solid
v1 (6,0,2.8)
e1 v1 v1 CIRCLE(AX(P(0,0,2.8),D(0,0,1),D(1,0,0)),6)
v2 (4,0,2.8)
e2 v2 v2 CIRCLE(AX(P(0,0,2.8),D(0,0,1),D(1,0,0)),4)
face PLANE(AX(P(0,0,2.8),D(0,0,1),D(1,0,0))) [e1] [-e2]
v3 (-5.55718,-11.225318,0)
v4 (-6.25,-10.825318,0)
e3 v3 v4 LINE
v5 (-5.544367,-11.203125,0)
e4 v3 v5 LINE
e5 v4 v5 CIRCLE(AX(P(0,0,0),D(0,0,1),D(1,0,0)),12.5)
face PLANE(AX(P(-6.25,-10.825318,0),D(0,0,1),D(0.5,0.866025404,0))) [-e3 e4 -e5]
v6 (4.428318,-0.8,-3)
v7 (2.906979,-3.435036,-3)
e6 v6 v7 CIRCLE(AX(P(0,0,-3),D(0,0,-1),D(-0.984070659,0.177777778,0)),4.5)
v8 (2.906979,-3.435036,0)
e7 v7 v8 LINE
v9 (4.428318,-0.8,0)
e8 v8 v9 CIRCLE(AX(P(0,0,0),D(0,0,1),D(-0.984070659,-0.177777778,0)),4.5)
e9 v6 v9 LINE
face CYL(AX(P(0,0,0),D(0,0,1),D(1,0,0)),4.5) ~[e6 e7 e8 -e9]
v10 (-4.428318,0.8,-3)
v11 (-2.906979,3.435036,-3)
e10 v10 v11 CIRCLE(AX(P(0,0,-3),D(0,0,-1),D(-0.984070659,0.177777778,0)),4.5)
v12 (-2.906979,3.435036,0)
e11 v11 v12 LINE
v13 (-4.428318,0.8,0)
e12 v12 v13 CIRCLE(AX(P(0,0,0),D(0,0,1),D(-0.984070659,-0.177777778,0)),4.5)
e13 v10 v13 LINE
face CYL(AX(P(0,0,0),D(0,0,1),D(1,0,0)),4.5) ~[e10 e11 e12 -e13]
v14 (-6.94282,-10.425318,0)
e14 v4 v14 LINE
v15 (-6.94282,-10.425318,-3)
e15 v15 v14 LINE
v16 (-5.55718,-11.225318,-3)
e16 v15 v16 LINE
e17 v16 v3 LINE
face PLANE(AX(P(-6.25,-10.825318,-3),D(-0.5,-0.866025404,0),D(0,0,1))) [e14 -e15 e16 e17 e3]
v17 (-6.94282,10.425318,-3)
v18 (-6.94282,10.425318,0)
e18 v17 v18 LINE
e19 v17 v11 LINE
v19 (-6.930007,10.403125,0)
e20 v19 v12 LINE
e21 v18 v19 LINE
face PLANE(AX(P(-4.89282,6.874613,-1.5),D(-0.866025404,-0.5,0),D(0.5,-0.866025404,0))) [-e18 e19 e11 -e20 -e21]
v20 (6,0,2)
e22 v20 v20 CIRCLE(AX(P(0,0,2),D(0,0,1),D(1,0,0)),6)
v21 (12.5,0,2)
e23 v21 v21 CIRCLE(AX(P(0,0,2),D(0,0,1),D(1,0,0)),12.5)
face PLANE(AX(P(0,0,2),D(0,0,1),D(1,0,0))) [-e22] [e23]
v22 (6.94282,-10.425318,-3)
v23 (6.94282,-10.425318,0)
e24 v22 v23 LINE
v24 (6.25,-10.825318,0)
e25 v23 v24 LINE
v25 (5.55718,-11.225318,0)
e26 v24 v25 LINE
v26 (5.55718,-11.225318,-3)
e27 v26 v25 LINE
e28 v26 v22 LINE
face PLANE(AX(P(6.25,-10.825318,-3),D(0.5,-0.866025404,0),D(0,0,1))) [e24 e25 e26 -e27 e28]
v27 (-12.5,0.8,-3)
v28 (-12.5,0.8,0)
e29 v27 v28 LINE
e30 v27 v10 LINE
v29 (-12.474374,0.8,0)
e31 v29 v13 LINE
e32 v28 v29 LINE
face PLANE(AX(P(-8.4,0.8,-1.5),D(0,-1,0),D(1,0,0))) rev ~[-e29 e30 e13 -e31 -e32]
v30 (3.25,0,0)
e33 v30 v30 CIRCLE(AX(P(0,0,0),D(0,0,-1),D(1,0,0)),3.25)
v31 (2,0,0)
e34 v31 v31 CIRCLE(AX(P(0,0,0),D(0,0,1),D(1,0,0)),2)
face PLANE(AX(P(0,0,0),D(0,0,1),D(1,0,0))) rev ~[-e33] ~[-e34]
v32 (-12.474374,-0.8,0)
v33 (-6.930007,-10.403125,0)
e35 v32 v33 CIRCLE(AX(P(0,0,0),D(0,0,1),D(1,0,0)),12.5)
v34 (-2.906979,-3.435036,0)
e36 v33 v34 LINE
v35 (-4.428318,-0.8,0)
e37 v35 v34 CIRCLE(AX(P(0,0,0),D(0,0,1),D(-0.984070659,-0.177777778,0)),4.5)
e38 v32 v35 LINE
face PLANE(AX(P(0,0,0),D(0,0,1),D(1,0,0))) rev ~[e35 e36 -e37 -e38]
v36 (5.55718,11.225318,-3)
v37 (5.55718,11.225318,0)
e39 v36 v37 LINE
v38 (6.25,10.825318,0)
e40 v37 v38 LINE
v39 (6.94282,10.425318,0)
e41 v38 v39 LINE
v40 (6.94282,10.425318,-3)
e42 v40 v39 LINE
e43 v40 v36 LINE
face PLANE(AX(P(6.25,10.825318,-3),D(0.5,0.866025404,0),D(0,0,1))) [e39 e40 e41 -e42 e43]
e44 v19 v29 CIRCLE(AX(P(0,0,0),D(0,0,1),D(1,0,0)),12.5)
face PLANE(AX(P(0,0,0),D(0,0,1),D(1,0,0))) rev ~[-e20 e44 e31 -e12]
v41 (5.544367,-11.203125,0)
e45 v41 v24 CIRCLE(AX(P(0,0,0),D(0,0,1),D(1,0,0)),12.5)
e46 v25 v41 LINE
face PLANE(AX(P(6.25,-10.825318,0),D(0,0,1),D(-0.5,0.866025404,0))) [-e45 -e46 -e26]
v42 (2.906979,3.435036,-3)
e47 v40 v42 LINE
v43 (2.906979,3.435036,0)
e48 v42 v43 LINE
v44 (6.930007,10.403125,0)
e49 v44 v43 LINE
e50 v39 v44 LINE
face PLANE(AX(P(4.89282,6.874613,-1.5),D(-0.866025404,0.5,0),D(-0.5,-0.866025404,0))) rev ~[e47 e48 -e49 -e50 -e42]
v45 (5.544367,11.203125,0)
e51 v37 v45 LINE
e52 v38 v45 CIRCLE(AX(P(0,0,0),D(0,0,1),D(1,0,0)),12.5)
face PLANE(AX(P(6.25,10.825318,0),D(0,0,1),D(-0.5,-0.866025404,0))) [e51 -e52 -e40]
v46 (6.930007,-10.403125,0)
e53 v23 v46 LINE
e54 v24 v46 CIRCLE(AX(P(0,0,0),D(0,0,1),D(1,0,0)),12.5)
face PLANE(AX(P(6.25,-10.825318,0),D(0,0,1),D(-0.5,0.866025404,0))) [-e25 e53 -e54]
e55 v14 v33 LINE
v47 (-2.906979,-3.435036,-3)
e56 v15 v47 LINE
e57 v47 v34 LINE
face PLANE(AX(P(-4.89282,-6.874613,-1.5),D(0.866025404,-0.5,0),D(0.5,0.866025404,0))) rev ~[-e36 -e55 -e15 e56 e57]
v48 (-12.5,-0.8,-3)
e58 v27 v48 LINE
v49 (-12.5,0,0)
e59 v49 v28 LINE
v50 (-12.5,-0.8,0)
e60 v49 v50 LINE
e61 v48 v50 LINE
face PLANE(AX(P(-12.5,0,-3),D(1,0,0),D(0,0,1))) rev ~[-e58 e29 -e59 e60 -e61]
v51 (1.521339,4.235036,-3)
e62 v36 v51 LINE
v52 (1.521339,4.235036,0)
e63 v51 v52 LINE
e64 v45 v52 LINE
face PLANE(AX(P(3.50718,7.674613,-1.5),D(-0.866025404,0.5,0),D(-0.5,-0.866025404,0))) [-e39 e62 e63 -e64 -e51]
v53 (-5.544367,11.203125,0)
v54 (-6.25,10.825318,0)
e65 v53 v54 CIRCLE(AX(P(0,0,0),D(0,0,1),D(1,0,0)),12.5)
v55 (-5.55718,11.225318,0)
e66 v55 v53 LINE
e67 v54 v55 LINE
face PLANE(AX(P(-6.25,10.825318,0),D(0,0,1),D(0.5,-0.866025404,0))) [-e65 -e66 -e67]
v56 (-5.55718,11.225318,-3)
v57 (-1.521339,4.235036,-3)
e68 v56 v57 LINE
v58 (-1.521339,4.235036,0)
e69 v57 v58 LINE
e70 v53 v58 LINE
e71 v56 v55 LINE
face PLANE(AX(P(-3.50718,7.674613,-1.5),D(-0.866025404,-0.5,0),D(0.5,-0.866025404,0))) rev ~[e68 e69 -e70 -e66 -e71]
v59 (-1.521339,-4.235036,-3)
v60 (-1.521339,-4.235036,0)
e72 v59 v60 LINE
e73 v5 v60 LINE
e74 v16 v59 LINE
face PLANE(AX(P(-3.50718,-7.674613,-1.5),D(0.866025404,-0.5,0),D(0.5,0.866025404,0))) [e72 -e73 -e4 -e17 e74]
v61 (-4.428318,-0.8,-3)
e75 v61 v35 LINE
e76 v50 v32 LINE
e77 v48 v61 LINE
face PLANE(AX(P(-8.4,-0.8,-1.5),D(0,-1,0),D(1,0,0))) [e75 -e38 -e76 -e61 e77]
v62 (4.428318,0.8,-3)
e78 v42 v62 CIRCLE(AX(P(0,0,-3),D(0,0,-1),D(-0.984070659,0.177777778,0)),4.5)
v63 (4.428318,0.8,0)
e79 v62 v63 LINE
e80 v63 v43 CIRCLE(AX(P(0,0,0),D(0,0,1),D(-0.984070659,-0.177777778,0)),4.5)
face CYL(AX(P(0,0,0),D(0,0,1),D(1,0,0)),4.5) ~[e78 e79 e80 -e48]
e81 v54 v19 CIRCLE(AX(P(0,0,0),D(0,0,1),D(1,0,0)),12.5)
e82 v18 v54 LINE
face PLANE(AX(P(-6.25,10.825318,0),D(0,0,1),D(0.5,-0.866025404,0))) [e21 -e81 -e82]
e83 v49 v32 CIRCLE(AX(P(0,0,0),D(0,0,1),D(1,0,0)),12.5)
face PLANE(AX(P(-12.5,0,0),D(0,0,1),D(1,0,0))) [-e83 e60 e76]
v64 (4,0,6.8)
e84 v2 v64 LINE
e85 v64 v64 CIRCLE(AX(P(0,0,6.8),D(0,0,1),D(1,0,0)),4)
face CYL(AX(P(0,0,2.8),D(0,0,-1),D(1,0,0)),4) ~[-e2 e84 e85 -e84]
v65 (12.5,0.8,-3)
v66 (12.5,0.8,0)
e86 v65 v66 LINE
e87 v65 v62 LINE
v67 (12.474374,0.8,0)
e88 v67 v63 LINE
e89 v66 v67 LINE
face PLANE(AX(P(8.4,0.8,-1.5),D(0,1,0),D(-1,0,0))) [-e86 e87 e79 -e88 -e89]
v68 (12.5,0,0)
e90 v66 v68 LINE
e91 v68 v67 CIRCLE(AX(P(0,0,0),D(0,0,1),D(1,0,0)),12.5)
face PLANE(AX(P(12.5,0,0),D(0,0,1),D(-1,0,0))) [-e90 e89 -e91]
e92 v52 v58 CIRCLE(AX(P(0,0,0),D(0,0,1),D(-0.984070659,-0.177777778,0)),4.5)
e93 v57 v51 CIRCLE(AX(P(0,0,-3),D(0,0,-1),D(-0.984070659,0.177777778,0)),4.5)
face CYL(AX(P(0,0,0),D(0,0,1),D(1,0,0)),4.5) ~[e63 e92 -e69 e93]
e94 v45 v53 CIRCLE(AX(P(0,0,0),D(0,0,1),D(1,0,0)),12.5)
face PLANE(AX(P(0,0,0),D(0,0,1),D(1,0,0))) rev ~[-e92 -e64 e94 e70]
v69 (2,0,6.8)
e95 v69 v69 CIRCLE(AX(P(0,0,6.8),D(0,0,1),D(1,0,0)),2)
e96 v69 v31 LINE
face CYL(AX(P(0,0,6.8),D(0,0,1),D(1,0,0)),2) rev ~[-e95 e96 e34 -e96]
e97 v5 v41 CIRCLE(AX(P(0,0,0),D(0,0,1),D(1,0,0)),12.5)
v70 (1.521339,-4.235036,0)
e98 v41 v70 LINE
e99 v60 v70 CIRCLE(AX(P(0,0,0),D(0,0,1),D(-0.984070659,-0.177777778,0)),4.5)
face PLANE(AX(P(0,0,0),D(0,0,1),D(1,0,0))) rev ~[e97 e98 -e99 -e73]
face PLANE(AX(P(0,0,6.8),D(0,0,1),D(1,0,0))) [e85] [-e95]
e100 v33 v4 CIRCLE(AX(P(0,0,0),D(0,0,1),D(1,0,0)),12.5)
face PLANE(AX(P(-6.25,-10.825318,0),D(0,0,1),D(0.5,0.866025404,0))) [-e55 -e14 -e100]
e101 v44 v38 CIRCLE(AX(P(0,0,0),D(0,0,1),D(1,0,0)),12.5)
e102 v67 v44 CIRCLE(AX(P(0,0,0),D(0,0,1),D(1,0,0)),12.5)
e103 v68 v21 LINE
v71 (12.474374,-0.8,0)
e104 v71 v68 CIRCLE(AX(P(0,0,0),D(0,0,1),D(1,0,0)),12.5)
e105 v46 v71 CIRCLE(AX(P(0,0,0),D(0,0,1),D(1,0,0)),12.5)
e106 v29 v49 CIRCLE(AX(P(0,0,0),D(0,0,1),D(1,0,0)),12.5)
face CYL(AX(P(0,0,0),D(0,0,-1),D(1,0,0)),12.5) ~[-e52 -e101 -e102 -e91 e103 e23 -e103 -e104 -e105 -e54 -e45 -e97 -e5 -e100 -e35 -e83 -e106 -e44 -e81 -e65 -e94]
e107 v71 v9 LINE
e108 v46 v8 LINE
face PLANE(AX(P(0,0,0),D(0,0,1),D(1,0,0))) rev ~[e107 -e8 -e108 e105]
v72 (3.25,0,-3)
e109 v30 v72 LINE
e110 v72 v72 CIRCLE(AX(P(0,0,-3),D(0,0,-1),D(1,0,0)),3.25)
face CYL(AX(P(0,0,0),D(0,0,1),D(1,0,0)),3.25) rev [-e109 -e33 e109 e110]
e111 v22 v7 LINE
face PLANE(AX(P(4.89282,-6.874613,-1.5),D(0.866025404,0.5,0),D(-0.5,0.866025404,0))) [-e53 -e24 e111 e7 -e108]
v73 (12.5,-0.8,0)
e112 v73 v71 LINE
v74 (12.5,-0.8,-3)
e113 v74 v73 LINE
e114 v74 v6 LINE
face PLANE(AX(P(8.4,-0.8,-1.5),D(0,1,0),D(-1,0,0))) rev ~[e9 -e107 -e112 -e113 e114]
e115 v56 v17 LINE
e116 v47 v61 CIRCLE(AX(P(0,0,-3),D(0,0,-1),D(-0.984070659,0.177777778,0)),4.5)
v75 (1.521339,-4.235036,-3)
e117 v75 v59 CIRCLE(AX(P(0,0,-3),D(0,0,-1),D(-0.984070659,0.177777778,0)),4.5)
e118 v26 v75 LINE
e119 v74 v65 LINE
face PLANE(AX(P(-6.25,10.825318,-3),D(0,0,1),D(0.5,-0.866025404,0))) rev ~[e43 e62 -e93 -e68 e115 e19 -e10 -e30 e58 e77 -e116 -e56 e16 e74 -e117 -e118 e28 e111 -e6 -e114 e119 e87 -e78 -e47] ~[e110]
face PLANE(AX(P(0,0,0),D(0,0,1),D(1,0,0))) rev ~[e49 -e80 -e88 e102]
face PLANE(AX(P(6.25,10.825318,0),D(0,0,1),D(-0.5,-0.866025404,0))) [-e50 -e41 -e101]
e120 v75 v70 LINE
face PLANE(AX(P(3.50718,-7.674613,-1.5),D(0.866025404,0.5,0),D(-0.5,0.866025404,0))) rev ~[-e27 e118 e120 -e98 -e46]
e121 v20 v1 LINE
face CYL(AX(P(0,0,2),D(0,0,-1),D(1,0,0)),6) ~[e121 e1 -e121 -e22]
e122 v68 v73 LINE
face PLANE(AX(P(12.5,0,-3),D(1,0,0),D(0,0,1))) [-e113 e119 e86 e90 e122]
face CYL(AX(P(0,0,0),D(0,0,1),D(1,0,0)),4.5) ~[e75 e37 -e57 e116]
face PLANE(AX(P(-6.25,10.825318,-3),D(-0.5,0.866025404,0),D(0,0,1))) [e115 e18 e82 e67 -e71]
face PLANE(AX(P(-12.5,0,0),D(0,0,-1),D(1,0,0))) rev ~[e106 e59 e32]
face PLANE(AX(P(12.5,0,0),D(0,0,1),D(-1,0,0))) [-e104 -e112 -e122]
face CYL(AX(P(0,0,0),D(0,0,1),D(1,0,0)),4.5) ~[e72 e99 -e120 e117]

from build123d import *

# Parameters (mm, degrees)
F0_R             = 12.5
F1_DEPTH         = 2
F2_R             = 6
F3_DEPTH         = 0.8
F4_R             = 4
F5_DEPTH         = 4
F6_R             = 2
F7_DEPTH         = 6.8
F8_R             = 4.5
F8_R_2           = 3.25
F9_DEPTH         = 3
F10_W            = 8.2
F10_H            = 3
F11_DEPTH        = 0.8
F11_DEPTH_BACK   = 0.8
F11_COPIES_COUNT = 6


# Not quite as in the source:
# - a pattern or mirror of a feature is missing from the dataset's text; its kind, count and spacing are read off the source's solid


with BuildPart() as f1:
    # F0 (on Top) → F1 (new body)
    with BuildSketch(Plane.XY):
        Circle(F0_R)
    extrude(amount=F1_DEPTH)

    # F2 (on face) → F3 (join)
    with BuildSketch(Plane.XY.offset(2)):
        Circle(F2_R)
    extrude(amount=F3_DEPTH)

    # F4 (on face) → F5 (join)
    with BuildSketch(Plane.XY.offset(2.8)):
        Circle(F4_R)
    extrude(amount=F5_DEPTH)

    # F6 (on face) → F7 (cut, through all)
    with BuildSketch(Plane.XY.offset(6.8)):
        Circle(F6_R)
    extrude(amount=-F7_DEPTH, mode=Mode.SUBTRACT)

    # F8 (on face) → F9 (join)
    with BuildSketch(Plane(origin=(0, 0, 0), x_dir=(1, 0, 0), z_dir=(0, 0, -1))):
        Circle(F8_R)
        Circle(F8_R_2, mode=Mode.SUBTRACT)
    extrude(amount=F9_DEPTH)

    # F10 (on Front) → F11 (join, two sides)
    with BuildSketch(Plane.XZ) as f11_sk:
        with Locations((-8.4, -1.5)):
            Rectangle(F10_W, F10_H)
    f11 = extrude(amount=F11_DEPTH) + extrude(f11_sk.sketch, amount=-F11_DEPTH_BACK)

    # F11_copies: F11 ×6 about axis
    f11_copies_axis = Axis((0, 0, 0), (0, 0, 1))
    for i in range(1, F11_COPIES_COUNT):
        add(f11.rotate(f11_copies_axis, i * 360 / F11_COPIES_COUNT))


solid = f1.part
